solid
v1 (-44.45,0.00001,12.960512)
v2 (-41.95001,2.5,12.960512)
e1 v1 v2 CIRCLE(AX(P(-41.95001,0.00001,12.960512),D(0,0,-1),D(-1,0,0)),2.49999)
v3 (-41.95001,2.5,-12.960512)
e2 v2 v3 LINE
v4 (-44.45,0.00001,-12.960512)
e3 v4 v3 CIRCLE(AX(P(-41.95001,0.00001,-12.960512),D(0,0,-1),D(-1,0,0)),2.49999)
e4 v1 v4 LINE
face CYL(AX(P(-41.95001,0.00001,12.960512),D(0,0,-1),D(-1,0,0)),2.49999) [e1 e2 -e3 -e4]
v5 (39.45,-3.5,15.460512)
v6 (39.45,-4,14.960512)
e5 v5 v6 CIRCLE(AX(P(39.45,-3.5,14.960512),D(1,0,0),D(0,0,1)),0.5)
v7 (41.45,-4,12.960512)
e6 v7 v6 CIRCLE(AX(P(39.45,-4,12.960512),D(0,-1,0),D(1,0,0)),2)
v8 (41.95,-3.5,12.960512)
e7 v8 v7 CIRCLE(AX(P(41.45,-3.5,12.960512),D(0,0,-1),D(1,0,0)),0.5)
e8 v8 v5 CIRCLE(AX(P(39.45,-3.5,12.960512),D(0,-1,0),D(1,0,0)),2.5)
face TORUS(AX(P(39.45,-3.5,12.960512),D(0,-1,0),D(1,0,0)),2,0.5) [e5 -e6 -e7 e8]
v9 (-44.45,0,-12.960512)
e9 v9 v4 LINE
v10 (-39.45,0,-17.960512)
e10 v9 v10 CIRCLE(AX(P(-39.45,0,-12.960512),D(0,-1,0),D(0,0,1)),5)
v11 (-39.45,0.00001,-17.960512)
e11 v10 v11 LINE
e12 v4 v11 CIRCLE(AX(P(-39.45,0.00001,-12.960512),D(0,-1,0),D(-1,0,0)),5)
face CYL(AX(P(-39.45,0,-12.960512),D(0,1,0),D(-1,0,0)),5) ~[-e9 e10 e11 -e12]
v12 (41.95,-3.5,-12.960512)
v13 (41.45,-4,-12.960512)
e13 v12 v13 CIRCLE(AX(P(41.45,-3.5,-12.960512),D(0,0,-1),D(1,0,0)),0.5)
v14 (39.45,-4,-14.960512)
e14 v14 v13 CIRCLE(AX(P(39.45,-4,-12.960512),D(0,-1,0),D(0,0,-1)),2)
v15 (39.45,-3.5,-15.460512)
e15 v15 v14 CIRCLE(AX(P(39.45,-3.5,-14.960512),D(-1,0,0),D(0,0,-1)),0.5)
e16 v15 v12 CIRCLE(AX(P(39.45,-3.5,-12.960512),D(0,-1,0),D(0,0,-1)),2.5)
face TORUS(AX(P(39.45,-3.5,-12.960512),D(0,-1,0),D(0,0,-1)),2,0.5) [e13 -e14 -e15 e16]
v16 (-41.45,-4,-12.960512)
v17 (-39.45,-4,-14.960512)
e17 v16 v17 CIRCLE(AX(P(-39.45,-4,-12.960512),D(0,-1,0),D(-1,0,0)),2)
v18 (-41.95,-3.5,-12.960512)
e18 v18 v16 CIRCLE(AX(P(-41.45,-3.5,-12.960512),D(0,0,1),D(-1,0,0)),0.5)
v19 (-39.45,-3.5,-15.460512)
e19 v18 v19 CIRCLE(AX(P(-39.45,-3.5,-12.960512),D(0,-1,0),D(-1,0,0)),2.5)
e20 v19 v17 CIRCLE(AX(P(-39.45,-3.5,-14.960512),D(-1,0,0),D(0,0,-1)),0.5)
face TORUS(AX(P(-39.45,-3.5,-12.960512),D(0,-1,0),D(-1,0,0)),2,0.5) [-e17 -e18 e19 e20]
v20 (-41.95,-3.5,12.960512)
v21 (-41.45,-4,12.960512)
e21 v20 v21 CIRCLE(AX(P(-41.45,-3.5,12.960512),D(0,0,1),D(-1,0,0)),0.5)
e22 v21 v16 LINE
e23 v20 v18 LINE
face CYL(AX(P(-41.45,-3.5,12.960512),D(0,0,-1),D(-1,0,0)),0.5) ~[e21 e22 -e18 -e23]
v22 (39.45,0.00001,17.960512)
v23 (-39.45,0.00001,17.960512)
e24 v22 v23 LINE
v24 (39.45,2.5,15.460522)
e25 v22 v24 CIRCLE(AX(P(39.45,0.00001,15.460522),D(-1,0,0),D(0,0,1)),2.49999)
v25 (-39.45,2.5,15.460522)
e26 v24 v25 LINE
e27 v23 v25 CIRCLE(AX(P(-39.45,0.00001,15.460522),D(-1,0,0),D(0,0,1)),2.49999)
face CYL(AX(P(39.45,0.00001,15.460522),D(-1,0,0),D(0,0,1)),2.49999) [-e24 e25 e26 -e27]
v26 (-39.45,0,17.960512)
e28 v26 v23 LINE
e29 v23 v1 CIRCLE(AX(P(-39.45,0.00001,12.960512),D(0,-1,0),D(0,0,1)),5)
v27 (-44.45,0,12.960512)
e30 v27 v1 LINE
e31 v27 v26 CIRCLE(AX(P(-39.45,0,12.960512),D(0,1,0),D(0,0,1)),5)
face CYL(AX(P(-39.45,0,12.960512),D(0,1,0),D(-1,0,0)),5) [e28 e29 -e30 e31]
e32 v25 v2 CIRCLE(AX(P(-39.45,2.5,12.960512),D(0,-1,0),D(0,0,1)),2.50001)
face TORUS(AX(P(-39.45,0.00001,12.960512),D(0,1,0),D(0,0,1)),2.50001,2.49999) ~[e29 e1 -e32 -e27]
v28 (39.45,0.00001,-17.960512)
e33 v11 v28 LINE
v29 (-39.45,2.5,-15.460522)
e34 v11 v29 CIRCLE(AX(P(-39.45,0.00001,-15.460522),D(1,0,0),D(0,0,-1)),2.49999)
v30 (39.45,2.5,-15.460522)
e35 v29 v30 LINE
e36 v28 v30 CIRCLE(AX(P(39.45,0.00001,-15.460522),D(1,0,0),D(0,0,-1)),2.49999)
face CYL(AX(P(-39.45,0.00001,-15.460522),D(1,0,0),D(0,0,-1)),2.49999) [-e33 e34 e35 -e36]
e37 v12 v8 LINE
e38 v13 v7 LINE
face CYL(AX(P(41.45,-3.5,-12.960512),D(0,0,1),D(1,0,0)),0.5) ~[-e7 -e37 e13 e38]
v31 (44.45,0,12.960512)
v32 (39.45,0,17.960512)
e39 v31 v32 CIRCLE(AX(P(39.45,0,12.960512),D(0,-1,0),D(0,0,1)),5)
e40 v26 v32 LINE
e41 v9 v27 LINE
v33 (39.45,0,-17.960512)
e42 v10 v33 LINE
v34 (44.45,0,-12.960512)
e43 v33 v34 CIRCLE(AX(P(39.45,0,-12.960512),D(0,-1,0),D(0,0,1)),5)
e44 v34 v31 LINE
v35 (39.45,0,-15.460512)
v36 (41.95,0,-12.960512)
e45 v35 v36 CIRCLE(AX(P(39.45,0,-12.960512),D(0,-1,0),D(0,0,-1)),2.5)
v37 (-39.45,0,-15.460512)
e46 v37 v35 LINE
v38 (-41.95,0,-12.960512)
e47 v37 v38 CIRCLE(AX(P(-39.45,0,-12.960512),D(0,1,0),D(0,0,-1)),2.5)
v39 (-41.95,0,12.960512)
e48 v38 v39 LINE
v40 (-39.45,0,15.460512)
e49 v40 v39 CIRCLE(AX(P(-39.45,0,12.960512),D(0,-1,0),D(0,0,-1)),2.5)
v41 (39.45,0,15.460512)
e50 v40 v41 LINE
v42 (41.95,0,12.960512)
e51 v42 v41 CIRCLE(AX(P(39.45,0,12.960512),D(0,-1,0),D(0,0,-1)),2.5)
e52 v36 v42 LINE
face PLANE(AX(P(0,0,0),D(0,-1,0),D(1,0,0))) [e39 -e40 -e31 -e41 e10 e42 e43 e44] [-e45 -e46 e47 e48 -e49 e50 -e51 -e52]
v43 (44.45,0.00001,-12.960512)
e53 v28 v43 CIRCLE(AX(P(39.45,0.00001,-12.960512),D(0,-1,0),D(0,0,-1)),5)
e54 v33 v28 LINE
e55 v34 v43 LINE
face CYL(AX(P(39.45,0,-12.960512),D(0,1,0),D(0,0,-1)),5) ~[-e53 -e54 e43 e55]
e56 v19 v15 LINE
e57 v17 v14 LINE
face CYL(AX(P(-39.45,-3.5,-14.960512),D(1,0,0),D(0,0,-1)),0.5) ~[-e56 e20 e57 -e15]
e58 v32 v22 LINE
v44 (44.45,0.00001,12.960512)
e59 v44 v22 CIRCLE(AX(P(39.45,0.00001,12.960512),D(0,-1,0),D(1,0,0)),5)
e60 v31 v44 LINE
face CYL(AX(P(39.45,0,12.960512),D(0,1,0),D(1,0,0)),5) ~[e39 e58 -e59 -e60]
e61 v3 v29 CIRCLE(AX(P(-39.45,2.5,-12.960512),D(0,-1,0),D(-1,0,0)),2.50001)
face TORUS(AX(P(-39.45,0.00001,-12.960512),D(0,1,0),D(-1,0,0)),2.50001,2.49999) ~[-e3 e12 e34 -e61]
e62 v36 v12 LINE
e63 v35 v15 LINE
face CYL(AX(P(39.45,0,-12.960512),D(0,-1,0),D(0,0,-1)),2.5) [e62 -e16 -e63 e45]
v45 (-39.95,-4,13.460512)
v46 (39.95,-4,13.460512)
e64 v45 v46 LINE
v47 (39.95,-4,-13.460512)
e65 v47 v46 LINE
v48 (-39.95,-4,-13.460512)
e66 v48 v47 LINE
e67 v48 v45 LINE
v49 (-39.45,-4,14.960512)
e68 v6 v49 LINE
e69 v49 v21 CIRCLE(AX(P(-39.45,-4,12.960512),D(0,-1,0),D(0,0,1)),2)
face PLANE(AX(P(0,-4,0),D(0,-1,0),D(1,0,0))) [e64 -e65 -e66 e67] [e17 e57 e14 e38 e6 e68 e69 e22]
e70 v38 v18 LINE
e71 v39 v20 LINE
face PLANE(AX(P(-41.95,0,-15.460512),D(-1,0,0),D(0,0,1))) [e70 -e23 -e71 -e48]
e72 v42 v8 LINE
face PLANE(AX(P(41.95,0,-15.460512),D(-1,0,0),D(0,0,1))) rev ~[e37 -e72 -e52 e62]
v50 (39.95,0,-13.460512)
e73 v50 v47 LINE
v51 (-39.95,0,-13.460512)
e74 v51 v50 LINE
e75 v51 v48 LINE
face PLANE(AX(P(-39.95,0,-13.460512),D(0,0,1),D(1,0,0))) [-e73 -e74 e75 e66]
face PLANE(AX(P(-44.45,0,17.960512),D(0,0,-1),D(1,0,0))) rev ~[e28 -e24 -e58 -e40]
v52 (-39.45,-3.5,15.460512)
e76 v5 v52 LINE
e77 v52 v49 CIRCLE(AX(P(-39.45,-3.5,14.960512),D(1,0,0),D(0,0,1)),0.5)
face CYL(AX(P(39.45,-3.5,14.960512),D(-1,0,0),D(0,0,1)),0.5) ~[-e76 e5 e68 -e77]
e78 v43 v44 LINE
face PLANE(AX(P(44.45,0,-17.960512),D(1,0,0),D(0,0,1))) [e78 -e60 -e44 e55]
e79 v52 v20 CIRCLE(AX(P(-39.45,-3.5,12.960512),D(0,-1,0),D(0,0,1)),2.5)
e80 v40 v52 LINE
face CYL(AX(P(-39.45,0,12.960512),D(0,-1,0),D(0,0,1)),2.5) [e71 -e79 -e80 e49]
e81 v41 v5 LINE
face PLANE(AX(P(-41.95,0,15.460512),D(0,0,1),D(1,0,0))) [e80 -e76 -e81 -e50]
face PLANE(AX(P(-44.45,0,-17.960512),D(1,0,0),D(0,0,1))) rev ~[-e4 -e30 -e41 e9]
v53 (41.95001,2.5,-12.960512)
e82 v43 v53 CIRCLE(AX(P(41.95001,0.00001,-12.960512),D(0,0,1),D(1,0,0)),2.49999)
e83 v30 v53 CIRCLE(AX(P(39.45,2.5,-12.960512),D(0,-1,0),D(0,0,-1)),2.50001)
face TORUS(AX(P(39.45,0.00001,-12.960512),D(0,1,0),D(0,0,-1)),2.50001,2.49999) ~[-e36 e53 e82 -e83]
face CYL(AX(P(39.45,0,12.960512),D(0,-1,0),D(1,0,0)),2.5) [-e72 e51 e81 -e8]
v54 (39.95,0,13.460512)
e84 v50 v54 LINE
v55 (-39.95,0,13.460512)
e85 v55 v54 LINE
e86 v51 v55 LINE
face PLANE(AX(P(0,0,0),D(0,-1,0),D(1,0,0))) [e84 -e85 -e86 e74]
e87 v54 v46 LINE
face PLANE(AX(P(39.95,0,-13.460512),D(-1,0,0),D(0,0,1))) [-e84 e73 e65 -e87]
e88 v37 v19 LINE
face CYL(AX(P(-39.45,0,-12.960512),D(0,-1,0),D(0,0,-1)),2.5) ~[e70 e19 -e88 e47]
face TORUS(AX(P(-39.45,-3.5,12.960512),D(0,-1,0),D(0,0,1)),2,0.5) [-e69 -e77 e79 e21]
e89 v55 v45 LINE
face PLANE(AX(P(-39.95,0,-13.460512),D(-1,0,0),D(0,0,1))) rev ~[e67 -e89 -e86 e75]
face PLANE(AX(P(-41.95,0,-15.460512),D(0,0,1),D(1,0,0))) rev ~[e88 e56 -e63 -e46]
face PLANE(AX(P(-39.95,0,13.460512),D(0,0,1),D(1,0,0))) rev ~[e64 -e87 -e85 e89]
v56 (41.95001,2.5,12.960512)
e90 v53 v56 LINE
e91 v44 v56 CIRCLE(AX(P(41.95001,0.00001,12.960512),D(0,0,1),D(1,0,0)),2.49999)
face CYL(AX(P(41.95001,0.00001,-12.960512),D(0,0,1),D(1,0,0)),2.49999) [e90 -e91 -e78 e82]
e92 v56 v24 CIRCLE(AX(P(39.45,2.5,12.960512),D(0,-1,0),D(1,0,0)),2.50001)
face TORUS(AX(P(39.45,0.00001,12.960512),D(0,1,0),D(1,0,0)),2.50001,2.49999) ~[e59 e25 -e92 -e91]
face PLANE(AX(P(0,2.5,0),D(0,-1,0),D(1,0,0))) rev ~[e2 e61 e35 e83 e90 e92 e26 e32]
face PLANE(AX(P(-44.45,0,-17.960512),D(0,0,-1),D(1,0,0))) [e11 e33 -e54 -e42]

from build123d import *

# Parameters (mm, degrees)
F2_W     = 88.9
F2_H     = 35.9210244843
F3_DEPTH = 2.5
F4_R     = 5
F5_W     = 83.9
F5_H     = 30.9210244843
F5_W_2   = 79.9
F5_H_2   = 26.9210244843
F6_DEPTH = 4
F7_R     = 2.5
F8_R     = 2.49999
F9_R     = 0.5


# Not quite as in the source:
# - a fillet or chamfer is up to 0.001 mm smaller than in the source, because OpenCascade refuses the exact size


with BuildPart() as f3:
    # F2 (on Front) → F3 (new body)
    with BuildSketch(Plane.XZ):
        Rectangle(F2_W, F2_H)
    extrude(amount=-F3_DEPTH)

    # F4
    f4_edges = [f3.edges().sort_by_distance(p)[0] for p in [
        (44.45, 1.25, 17.960512),
        (44.45, 1.25, -17.960512),
        (-44.45, 1.25, -17.960512),
        (-44.45, 1.25, 17.960512),
    ]]
    fillet(f4_edges, radius=F4_R)

    # F5 (on Front) → F6 (join)
    with BuildSketch(Plane.XZ):
        Rectangle(F5_W, F5_H)
        Rectangle(F5_W_2, F5_H_2, mode=Mode.SUBTRACT)
    extrude(amount=F6_DEPTH)

    # F7
    f7_edges = [f3.edges().sort_by_distance(p)[0] for p in [
        (-41.95, -2, -15.460512),
        (-41.95, -2, 15.460512),
        (41.95, -2, -15.460512),
        (41.95, -2, 15.460512),
    ]]
    fillet(f7_edges, radius=F7_R)

    # F8 (radius 2.5 in the source; OpenCascade refuses exactly that, so slightly less here)
    f8_edges = [f3.edges().sort_by_distance(p)[0] for p in [
        (0, 2.5, -17.960512),
    ]]
    fillet(f8_edges, radius=F8_R)

    # F9
    f9_edges = [f3.edges().sort_by_distance(p)[0] for p in [
        (41.95, -4, 0),
    ]]
    fillet(f9_edges, radius=F9_R)


solid = f3.part
